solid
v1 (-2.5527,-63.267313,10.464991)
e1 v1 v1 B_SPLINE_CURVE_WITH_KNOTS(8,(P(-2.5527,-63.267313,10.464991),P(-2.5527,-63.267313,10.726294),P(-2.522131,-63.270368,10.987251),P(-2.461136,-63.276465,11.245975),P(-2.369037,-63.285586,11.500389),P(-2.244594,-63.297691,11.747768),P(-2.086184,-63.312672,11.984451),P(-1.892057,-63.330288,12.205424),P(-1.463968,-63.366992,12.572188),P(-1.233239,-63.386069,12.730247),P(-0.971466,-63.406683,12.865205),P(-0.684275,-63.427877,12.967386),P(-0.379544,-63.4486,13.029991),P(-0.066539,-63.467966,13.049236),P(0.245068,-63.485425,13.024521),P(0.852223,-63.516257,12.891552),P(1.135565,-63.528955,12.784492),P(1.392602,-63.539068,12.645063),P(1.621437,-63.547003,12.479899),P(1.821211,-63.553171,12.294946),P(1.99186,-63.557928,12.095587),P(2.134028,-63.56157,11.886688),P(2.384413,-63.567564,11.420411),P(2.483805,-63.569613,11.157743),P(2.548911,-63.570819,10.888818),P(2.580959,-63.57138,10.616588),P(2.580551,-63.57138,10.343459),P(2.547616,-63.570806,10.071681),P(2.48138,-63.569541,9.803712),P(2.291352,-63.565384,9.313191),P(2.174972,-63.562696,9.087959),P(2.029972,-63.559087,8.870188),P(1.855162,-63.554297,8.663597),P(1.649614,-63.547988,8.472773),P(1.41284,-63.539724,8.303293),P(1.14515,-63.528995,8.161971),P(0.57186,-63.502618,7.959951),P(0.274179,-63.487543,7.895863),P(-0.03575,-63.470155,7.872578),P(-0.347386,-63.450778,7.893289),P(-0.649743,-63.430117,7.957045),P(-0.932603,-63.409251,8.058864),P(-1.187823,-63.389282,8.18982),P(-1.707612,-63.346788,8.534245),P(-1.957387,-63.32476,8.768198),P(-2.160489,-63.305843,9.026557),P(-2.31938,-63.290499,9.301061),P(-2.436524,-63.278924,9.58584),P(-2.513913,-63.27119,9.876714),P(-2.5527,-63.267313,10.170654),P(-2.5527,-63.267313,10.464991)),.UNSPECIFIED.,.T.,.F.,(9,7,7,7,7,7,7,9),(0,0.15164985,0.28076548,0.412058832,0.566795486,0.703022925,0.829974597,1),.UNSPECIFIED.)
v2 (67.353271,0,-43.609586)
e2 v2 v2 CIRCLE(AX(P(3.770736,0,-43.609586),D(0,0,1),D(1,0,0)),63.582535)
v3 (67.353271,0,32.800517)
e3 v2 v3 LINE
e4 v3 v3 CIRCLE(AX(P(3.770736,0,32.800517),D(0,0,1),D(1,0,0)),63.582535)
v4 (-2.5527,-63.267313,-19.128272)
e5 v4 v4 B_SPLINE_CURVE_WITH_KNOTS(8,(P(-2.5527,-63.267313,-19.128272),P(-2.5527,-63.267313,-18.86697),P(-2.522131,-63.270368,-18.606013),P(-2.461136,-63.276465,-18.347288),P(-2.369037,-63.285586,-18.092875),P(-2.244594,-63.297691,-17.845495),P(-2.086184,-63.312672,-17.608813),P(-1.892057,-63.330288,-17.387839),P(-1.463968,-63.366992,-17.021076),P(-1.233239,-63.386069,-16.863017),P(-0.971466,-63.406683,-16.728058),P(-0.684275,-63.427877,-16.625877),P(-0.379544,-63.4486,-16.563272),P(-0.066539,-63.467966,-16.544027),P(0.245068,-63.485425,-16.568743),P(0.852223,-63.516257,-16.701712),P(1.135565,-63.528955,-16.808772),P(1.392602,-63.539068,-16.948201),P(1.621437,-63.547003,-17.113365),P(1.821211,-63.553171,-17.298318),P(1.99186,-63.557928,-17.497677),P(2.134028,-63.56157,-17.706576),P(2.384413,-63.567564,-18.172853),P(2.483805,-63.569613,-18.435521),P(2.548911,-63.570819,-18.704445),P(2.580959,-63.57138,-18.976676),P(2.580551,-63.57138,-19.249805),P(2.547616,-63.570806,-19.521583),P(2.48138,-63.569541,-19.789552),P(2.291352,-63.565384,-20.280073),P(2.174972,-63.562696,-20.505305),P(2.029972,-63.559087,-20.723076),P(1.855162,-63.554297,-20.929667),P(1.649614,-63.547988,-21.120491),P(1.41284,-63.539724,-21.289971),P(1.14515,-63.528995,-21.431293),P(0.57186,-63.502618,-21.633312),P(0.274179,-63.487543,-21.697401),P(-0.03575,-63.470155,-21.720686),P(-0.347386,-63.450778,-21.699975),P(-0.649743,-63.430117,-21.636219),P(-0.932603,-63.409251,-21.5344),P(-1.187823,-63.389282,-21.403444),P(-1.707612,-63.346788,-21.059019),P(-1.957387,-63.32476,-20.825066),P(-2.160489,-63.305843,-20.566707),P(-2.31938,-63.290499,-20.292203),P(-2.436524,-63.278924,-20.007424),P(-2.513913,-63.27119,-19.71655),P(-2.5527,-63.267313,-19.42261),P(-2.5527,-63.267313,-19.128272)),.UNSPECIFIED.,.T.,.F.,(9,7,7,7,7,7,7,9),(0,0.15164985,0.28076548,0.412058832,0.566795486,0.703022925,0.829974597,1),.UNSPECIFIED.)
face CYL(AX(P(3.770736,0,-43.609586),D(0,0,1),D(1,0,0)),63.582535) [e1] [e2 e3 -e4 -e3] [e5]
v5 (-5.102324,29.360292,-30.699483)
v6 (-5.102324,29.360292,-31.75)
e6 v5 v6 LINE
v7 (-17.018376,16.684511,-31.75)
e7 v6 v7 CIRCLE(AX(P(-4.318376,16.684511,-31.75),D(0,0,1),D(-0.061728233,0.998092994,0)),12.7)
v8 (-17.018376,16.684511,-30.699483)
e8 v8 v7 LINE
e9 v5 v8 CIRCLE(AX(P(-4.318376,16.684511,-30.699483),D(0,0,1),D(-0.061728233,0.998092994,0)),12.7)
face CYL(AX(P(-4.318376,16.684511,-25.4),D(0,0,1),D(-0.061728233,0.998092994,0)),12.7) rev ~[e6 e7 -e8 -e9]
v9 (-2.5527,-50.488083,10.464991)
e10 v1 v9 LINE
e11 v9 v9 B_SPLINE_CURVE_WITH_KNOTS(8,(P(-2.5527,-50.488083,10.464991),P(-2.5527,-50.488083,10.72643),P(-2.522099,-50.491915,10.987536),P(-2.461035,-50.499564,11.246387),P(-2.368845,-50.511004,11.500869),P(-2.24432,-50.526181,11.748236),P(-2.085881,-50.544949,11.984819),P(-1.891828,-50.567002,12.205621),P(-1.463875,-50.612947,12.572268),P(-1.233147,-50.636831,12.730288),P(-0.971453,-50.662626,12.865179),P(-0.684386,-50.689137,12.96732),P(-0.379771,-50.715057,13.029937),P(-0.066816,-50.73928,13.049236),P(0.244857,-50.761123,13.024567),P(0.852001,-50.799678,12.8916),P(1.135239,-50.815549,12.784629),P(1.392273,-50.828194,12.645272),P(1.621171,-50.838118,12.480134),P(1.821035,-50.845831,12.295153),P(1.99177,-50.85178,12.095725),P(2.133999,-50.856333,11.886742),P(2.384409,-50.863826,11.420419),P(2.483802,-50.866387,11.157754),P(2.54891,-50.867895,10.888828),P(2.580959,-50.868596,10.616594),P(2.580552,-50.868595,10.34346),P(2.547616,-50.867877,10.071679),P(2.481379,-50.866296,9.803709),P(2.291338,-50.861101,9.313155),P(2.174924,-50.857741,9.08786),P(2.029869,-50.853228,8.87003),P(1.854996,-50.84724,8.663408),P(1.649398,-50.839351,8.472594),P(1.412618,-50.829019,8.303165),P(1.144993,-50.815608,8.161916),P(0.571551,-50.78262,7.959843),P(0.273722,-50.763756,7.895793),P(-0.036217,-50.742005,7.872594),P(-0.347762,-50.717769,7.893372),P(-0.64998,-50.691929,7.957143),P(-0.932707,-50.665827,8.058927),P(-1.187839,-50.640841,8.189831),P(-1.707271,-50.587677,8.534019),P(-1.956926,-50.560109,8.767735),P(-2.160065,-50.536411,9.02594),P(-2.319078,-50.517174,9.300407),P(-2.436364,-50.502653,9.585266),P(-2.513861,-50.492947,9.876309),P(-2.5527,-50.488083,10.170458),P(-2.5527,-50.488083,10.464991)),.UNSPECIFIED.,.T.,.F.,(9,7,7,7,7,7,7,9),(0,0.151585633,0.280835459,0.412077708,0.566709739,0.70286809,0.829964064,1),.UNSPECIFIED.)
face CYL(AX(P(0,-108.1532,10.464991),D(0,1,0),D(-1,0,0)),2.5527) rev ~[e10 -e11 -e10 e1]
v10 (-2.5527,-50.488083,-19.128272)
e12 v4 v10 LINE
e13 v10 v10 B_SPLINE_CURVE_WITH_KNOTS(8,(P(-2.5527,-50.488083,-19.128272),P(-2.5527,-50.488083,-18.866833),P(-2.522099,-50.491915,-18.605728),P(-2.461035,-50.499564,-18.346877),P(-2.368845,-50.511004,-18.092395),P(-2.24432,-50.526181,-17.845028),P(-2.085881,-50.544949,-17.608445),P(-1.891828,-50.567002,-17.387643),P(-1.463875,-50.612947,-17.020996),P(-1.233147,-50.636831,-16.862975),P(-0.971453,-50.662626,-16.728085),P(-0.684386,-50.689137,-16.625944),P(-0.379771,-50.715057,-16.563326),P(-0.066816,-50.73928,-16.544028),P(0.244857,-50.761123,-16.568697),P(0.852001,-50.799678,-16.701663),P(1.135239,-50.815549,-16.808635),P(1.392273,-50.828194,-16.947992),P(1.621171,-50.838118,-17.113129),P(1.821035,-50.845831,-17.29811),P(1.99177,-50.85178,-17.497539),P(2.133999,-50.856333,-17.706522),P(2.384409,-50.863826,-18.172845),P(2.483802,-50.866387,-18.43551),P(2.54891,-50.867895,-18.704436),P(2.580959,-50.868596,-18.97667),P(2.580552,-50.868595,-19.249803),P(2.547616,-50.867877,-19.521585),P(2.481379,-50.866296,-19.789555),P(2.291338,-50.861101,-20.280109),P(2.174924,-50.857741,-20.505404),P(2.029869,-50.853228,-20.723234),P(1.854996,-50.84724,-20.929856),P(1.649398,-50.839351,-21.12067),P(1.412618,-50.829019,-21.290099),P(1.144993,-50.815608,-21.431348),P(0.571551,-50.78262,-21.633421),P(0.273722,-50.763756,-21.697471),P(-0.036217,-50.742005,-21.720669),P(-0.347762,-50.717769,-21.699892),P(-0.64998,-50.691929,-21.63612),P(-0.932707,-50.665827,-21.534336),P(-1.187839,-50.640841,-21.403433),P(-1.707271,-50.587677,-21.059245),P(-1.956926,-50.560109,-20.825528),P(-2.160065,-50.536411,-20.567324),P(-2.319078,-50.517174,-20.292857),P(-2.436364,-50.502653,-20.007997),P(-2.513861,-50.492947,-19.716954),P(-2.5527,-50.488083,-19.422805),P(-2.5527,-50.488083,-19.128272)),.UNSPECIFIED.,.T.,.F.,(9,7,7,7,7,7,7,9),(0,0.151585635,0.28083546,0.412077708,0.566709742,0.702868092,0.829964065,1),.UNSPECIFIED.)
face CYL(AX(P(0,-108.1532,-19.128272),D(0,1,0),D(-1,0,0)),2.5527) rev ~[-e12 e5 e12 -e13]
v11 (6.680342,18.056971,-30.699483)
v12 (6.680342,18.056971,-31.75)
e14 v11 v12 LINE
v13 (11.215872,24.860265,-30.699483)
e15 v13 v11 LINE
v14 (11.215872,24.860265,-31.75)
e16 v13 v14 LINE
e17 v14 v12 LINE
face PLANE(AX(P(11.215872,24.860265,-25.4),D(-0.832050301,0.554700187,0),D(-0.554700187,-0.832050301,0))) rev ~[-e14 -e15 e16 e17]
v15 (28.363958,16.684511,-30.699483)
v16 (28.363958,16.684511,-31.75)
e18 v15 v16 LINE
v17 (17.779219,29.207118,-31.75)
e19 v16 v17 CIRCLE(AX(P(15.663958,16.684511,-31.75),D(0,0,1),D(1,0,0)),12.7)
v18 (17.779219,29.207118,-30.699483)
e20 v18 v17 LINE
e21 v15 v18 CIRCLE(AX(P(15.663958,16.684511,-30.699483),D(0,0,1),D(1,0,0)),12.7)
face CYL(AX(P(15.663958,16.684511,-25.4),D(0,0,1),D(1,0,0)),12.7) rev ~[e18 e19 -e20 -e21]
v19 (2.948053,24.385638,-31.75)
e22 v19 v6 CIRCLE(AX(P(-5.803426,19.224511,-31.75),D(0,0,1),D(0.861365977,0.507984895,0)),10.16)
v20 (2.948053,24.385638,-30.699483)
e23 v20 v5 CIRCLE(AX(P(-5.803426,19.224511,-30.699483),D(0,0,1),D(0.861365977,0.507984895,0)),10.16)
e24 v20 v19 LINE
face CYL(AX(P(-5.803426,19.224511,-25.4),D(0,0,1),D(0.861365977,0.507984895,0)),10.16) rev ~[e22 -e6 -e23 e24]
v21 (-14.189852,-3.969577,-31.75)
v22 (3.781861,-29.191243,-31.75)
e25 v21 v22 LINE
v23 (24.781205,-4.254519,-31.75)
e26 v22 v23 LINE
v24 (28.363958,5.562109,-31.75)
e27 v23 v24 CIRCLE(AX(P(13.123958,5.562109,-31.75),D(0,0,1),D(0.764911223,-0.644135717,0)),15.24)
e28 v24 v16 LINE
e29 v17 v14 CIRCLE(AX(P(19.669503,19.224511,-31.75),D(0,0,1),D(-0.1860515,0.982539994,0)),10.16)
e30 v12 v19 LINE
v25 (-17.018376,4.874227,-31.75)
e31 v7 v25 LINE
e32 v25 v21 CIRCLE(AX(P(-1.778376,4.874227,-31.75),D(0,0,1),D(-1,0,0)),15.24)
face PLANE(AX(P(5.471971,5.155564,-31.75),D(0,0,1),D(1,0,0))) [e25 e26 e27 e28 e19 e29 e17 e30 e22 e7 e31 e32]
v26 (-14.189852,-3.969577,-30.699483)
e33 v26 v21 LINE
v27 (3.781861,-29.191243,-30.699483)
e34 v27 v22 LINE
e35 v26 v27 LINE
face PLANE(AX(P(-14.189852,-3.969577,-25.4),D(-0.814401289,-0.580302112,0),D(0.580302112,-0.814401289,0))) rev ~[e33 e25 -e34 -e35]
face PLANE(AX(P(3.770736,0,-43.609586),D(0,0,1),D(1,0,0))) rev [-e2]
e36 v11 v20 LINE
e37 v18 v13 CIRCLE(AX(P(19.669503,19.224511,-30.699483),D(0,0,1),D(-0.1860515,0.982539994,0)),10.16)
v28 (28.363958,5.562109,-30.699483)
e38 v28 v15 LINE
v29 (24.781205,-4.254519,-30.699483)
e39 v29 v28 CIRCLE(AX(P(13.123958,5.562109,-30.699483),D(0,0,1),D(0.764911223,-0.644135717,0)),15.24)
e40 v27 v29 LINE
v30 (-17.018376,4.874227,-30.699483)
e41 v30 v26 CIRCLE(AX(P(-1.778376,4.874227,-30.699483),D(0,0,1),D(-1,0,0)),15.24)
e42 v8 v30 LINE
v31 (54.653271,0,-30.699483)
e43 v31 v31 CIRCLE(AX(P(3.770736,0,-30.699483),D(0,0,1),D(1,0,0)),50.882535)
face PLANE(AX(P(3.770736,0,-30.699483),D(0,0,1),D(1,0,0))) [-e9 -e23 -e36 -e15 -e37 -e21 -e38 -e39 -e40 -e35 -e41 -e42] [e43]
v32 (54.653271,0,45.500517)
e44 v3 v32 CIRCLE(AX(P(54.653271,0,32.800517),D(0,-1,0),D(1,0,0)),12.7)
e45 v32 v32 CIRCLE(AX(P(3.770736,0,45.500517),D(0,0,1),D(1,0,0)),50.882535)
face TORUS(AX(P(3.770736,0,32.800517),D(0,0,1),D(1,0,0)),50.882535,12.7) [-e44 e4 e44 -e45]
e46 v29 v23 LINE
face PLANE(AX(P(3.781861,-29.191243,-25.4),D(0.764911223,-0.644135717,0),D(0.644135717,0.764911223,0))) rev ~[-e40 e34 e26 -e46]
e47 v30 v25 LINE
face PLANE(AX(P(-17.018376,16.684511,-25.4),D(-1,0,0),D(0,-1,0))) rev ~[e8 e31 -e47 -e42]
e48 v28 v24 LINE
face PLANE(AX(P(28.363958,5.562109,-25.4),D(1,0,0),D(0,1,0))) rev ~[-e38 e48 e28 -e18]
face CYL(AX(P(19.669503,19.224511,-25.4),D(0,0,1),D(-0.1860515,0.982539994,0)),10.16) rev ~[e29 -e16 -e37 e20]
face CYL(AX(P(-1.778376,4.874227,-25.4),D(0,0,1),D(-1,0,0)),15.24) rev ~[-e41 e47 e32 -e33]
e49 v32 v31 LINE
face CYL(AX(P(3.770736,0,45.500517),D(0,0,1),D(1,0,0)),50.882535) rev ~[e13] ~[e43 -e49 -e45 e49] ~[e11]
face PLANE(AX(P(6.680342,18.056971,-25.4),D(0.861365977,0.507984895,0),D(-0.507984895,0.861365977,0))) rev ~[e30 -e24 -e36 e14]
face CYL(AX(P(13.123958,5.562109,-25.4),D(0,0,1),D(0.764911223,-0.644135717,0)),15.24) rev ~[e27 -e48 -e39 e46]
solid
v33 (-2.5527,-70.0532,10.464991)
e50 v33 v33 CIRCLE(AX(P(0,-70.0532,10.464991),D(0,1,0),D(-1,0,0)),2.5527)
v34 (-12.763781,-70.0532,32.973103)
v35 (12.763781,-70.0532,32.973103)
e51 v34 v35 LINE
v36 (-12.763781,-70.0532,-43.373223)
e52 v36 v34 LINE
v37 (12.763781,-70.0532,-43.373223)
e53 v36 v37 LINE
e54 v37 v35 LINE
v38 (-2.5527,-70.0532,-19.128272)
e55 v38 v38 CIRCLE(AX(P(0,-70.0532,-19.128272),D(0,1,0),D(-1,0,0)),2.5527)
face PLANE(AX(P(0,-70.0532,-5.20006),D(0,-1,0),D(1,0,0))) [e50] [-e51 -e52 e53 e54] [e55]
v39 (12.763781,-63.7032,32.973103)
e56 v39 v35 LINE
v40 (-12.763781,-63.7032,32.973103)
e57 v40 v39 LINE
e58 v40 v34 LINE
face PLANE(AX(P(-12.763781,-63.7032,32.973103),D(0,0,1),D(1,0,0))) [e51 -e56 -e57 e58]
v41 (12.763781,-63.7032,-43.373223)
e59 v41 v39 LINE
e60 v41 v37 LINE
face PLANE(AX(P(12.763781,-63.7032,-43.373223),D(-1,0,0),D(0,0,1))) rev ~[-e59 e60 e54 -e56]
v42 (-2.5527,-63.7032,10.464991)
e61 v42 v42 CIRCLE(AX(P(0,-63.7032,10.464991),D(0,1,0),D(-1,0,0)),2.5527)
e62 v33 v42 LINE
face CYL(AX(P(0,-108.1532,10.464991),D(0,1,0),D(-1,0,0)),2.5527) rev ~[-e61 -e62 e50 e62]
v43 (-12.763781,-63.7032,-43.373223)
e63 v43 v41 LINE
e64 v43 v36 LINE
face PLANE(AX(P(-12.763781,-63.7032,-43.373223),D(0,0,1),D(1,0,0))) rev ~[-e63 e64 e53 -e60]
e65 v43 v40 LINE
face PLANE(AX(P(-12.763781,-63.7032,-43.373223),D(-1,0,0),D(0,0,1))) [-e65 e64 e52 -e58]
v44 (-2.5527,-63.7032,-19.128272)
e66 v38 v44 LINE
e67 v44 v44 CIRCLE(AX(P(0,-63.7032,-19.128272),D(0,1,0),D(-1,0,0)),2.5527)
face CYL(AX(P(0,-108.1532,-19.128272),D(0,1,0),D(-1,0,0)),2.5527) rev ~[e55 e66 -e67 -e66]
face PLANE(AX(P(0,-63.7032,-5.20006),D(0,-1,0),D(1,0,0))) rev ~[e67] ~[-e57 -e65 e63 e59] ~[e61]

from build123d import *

# Parameters (mm, degrees)
F2_DEPTH   = 76.2
F4_W       = 25.5275620148
F4_H       = 76.3463266194
F5_DEPTH   = 6.35
F9_D       = 5.1054
F9_DEPTH   = 38.1
F9_TIP     = 1.5338169022
F9_2_D     = 5.1054
F9_2_DEPTH = 38.1
F9_2_TIP   = 1.5338169022
F12_DEPTH  = 6.35


# Not quite as in the source:
# - a feature of the source that left no trace in its solid (it failed there, or was rolled back) is left out


with BuildPart() as f1:
    # F0 (on Front) → F1 (revolve)
    with BuildSketch(Plane.XZ):
        with BuildLine():
            Line((54.6532709479, 45.5005168915), (3.770736279, 45.5005168915))
            Line((3.770736279, 45.5005168915), (3.770736279, -43.609585613))
            Line((3.770736279, -43.609585613), (67.3532709479, -43.609585613))
            Line((67.3532709479, -43.609585613), (67.3532709479, 32.8005168915))
            ThreePointArc((67.3532709479, 32.8005168915), (63.633527069, 41.7807730125), (54.6532709479, 45.5005168915))
        make_face()
    revolve(axis=Axis((3.770736279, 0, 0.9454656392), (0, 0, 1)))

    # F2 (cut): a face of the model
    f2_faces = [f1.faces().sort_by_distance(p)[0] for p in [
        (3.770736279, 0, 45.5005168915),
    ]]
    extrude(f2_faces, amount=-F2_DEPTH, mode=Mode.SUBTRACT)

    # F9
    with Locations(Plane.XZ.offset(70.0532)):
        with Locations((0, 10.4649914429), (0, -19.1282723099)):
            Hole(F9_D / 2, depth=F9_DEPTH)
            with Locations((0, 0, -(F9_DEPTH + F9_TIP / 2))):  # 118° drill point
                Cone(0, F9_D / 2, F9_TIP, mode=Mode.SUBTRACT)

    # F11 (on offset) → F12 (cut)
    with BuildSketch(Plane.XY.offset(-25.4)):
        with BuildLine():
            Line((-14.1898515568, -3.9695769455), (3.7818609271, -29.1912425309))
            Line((3.7818609271, -29.1912425309), (24.7812050342, -4.254519477))
            ThreePointArc((24.7812050342, -4.254519477), (27.4402781426, 0.33711338), (28.3639580011, 5.5621088449))
            Line((28.3639580011, 5.5621088449), (28.3639580011, 16.6845112958))
            ThreePointArc((28.3639580011, 16.6845112958), (25.3632832083, 24.8828703101), (17.7792193355, 29.2071176335))
            ThreePointArc((17.7792193355, 29.2071176335), (14.0594292862, 27.6952065298), (11.2158715142, 24.860265191))
            Line((11.2158715142, 24.860265191), (6.6803421116, 18.0569709152))
            Line((6.6803421116, 18.0569709152), (2.9480526056, 24.3856378285))
            ThreePointArc((2.9480526056, 24.3856378285), (-0.4625819691, 27.8674846274), (-5.1023244743, 29.3602923235))
            ThreePointArc((-5.1023244743, 29.3602923235), (-13.5716495731, 25.3831851413), (-17.0183759183, 16.6845112958))
            Line((-17.0183759183, 16.6845112958), (-17.0183759183, 4.8742272403))
            ThreePointArc((-17.0183759183, 4.8742272403), (-16.2940310659, 0.2316680716), (-14.1898515568, -3.9695769455))
        make_face()
    extrude(amount=-F12_DEPTH, mode=Mode.SUBTRACT)


with BuildPart() as f5:
    # F4 (on offset) → F5 (new body)
    with BuildSketch(Plane.XZ.offset(63.7032)):
        with Locations((-4.657e-07, -5.2000600845)):
            Rectangle(F4_W, F4_H)
    extrude(amount=F5_DEPTH)

    # F9#2
    with Locations(Plane.XZ.offset(70.0532)):
        with Locations((0, 10.4649914429), (0, -19.1282723099)):
            Hole(F9_2_D / 2, depth=F9_2_DEPTH)
            with Locations((0, 0, -(F9_2_DEPTH + F9_2_TIP / 2))):  # 118° drill point
                Cone(0, F9_2_D / 2, F9_2_TIP, mode=Mode.SUBTRACT)


solid = Compound([f1.part, f5.part])
